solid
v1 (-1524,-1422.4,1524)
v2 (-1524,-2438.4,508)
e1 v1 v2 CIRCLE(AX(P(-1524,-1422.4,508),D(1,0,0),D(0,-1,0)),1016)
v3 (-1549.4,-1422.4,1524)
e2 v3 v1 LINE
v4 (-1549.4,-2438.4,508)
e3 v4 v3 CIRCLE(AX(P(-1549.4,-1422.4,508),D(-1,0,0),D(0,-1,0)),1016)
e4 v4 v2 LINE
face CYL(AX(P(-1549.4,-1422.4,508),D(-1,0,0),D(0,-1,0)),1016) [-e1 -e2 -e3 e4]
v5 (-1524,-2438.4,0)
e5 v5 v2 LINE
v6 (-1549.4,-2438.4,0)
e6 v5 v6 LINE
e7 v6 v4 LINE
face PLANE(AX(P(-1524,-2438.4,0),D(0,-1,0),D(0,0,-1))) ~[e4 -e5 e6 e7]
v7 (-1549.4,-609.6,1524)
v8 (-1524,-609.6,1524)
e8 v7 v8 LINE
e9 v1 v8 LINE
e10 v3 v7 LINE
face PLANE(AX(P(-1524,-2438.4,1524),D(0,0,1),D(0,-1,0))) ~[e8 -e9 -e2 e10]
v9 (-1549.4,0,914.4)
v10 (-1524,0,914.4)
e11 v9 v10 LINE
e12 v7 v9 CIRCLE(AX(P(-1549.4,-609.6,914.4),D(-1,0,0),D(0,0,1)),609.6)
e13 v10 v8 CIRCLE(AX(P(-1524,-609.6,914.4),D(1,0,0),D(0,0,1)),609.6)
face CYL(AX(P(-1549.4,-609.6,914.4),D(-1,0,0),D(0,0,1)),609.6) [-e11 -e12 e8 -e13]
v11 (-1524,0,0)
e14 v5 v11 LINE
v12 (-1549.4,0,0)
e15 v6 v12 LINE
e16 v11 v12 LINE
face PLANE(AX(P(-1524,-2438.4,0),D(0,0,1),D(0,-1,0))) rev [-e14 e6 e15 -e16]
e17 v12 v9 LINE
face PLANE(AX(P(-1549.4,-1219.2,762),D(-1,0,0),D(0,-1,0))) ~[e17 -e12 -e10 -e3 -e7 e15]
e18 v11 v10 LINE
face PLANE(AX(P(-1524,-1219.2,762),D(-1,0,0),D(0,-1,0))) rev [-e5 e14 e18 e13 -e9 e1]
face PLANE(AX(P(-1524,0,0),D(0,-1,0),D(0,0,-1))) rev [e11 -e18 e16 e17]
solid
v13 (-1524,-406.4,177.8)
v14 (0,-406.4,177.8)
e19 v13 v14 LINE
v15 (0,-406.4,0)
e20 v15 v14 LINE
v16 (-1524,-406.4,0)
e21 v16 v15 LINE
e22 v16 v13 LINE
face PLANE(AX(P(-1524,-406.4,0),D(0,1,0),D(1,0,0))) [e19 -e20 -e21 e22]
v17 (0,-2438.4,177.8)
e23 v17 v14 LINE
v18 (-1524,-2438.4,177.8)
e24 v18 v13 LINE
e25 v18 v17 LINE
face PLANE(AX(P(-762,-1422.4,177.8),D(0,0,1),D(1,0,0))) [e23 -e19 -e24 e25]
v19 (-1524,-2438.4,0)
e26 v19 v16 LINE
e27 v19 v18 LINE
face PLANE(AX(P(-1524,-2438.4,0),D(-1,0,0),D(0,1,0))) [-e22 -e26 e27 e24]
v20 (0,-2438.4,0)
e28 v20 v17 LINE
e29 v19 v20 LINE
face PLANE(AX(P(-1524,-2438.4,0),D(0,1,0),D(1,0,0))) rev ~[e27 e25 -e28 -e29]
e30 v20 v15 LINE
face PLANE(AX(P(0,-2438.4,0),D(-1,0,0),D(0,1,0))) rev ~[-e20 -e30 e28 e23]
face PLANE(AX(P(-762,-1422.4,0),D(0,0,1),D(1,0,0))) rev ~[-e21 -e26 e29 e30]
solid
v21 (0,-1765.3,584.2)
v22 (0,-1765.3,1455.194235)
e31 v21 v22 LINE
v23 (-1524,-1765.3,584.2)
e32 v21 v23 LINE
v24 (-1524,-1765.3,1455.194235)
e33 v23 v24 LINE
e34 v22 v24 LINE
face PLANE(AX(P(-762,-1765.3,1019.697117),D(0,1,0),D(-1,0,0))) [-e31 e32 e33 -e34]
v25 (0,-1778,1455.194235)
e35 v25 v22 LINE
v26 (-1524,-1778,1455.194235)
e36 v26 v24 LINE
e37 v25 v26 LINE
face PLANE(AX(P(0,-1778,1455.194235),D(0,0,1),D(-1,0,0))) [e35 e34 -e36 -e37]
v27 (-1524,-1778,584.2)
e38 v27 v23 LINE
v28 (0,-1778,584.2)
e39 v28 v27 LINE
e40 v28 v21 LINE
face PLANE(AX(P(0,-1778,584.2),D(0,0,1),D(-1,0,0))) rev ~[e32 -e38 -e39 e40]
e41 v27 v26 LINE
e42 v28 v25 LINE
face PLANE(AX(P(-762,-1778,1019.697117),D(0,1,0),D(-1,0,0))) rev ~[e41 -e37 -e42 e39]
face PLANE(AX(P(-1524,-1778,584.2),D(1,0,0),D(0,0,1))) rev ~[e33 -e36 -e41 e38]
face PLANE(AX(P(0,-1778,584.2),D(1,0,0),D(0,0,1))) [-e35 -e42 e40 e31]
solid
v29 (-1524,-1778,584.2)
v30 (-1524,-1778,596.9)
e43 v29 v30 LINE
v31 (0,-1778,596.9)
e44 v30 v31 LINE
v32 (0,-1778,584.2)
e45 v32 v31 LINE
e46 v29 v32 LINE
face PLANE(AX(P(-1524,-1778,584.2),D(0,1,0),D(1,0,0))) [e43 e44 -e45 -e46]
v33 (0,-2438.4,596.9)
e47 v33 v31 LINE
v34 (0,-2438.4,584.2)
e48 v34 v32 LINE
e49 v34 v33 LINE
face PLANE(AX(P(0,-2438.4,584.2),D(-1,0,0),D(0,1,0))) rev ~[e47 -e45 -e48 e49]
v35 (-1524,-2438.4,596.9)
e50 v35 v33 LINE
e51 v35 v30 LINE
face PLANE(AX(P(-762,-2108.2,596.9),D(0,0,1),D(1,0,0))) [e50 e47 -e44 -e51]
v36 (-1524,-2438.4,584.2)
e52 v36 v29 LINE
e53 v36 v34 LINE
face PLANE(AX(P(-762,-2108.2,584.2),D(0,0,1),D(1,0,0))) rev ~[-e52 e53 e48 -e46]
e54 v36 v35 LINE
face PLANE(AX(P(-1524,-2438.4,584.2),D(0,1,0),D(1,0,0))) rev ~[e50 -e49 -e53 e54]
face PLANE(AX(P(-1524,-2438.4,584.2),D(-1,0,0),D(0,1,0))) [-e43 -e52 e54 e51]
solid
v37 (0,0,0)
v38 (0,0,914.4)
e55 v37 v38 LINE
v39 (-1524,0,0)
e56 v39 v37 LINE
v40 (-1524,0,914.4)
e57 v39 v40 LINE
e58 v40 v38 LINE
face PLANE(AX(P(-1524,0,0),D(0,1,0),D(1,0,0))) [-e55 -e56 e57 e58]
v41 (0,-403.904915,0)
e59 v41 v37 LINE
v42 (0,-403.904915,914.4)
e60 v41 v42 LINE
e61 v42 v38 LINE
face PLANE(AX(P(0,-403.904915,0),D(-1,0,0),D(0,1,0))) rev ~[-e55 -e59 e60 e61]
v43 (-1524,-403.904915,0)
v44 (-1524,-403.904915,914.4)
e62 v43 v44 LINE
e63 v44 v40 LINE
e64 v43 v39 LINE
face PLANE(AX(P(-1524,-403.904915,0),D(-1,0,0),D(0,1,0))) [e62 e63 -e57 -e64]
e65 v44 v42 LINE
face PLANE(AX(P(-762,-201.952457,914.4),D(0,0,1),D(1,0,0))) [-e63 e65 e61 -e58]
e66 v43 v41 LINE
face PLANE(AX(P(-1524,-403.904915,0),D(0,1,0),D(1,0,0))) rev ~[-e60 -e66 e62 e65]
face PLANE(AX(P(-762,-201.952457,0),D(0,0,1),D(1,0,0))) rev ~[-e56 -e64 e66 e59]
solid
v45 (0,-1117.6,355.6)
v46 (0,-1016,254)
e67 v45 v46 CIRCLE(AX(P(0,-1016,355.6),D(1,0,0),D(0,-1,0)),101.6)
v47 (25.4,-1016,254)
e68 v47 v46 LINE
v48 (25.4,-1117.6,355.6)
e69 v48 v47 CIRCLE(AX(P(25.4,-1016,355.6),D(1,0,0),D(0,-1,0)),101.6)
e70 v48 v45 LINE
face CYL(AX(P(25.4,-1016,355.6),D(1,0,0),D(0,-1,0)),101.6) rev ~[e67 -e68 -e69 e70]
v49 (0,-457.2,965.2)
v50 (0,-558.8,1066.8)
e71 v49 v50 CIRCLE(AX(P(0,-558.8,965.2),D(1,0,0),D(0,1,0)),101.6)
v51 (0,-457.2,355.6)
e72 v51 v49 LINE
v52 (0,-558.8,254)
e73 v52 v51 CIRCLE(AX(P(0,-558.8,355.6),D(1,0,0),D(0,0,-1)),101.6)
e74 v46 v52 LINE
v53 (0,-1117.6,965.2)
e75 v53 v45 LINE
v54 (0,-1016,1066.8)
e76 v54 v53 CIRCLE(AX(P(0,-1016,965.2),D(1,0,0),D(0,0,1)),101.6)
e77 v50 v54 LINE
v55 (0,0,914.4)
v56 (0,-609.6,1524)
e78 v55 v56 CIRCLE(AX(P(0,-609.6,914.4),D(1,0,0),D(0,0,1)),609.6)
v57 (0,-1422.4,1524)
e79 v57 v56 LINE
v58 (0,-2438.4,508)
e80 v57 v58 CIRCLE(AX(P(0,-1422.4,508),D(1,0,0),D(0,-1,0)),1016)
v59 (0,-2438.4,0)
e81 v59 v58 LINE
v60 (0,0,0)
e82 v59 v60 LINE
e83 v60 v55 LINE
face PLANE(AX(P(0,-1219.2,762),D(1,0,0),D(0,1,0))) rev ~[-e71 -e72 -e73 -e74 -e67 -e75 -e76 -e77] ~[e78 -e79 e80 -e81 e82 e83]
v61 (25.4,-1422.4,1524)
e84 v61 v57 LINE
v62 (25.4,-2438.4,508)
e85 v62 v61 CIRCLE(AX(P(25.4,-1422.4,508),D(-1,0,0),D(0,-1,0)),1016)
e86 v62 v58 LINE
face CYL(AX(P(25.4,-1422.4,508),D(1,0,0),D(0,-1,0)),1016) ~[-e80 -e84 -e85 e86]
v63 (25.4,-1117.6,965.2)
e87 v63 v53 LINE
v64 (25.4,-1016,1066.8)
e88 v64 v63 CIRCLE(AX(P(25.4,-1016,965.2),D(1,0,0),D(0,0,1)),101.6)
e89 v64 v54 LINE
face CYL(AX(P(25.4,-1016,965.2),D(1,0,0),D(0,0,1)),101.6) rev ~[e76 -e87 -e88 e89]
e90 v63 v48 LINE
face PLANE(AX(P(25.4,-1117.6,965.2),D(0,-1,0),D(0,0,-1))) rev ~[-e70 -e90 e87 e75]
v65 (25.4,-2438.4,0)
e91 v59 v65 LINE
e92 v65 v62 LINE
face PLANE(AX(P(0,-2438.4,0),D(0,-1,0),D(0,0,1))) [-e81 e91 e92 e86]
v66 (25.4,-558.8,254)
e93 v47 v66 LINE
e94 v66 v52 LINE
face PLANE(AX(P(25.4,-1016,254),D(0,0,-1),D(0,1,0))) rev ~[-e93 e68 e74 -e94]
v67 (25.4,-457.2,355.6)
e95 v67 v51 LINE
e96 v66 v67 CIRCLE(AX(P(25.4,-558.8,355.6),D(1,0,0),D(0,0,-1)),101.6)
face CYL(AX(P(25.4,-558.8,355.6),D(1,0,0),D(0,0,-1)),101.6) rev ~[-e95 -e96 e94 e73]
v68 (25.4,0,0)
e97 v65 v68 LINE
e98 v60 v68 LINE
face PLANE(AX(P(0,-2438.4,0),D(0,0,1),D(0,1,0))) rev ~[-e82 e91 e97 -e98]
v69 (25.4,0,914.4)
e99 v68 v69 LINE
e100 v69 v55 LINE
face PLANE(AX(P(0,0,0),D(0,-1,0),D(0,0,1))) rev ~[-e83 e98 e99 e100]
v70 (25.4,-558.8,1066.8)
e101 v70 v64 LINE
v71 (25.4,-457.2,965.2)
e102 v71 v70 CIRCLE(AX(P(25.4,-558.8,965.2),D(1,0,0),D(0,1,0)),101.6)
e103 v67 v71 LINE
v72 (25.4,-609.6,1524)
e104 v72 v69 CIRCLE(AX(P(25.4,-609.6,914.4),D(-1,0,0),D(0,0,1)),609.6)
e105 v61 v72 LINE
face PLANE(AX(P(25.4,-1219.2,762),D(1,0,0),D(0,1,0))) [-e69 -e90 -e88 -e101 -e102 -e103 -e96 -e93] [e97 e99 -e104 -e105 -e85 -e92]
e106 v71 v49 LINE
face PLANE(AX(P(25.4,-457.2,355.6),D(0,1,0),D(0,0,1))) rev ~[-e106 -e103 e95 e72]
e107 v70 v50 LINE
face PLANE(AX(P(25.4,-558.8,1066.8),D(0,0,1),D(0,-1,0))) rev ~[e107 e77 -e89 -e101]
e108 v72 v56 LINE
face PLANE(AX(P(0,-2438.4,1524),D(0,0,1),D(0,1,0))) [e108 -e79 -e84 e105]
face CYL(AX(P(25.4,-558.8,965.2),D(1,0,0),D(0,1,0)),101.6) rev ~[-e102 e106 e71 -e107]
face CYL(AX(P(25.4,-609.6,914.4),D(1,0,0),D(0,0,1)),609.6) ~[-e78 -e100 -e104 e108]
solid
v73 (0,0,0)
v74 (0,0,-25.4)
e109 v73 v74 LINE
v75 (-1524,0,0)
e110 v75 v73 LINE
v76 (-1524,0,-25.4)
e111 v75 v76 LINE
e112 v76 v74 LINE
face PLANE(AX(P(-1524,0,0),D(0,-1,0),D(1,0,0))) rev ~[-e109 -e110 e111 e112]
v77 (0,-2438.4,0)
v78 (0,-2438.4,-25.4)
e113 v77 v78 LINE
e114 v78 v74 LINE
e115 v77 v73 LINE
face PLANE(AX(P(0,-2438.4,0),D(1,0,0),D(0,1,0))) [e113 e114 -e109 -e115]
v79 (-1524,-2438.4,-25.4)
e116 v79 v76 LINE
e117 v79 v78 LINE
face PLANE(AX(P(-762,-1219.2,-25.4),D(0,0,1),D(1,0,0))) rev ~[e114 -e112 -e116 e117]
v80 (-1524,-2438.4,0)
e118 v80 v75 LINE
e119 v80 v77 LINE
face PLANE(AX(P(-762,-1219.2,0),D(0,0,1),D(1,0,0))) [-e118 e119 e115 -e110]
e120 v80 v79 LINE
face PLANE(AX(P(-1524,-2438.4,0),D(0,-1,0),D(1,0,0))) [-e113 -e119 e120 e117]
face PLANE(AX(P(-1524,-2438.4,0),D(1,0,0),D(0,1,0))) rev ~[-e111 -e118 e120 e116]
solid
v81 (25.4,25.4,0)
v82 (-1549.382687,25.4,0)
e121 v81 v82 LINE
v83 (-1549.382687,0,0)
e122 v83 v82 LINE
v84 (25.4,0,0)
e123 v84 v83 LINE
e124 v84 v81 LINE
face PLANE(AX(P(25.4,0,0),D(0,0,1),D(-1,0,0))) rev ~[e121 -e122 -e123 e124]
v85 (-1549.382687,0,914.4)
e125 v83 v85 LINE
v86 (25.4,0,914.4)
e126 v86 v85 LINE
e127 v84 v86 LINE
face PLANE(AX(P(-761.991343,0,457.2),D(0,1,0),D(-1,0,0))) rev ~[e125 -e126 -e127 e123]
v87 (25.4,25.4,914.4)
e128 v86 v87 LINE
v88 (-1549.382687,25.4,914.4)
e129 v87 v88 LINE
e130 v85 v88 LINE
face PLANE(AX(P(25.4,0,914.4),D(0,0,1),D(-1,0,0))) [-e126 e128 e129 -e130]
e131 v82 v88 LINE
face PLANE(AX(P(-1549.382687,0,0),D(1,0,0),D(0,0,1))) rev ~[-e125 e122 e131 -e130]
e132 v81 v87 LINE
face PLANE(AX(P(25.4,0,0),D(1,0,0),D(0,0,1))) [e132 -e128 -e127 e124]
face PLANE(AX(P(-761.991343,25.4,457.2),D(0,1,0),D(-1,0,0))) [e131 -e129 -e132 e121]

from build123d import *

# Parameters (mm, degrees)
F0_W      = 2438.4
F0_H      = 1524
F1_DEPTH  = 25.4
F3_DEPTH  = 25.401
F4_W      = 1524
F4_H      = 2438.4
F5_DEPTH  = 25.4
F8_W      = 1574.782686615
F8_H      = 914.4
F9_DEPTH  = 25.4
F11_DEPTH = 1574.8
F12_W     = 1524
F12_H     = 2032
F13_DEPTH = 177.8
F15_W     = 1524
F15_H     = 660.4
F16_DEPTH = 12.7
F17_W     = 1524
F17_H     = 870.994234848
F18_DEPTH = 12.7
F19_W     = 1524
F19_H     = 403.904914856
F20_DEPTH = 914.4


with BuildPart() as f1:
    # F0 (on Right) → F1 (new body)
    with BuildSketch(Plane.YZ):
        with Locations((-1219.2, 762)):
            Rectangle(F0_W, F0_H)
    extrude(amount=F1_DEPTH)

    # F2 (on face) → F3 (cut, through all)
    with BuildSketch(Plane.YZ.offset(25.4)):
        with BuildLine():
            ThreePointArc((-2438.4, 508), (-2140.8204896855, 1226.4204896855), (-1422.4, 1524))
            Line((-1422.4, 1524), (-2438.4, 1524))
            Line((-2438.4, 1524), (-2438.4, 508))
        make_face()
        with BuildLine():
            ThreePointArc((-609.6, 1524), (-178.5477061887, 1345.4522938113), (0, 914.4))
            Line((0, 914.4), (0, 1524))
            Line((0, 1524), (-609.6, 1524))
        make_face()
    extrude(amount=-F3_DEPTH, mode=Mode.SUBTRACT)


with BuildPart() as f5:
    # F4 (on Top) → F5 (new body)
    with BuildSketch(Plane.XY):
        with Locations((-762, -1219.2)):
            Rectangle(F4_W, F4_H)
    extrude(amount=-F5_DEPTH)


with BuildPart() as f7_1:
    # F7: instance of F1
    add(f1.part.mirror(Plane.YZ.offset(-762)))


with BuildPart() as f9:
    # F8 (on face) → F9 (new body)
    with BuildSketch(Plane(origin=(0, 0, 0), x_dir=(-1, 0, 0), z_dir=(0, 1, 0))):
        with Locations((761.9913433075, 457.2)):
            Rectangle(F8_W, F8_H)
    extrude(amount=F9_DEPTH)


with BuildPart() as f1_1:
    add(f1.part)

    # F10 (on face) → F11 (cut)
    with BuildSketch(Plane.YZ.offset(25.4)):
        with BuildLine():
            Line((-558.8, 1066.8), (-1016, 1066.8))
            ThreePointArc((-1016, 1066.8), (-1087.8420489686, 1037.0420489686), (-1117.6, 965.2))
            Line((-1117.6, 965.2), (-1117.6, 355.6))
            ThreePointArc((-1117.6, 355.6), (-1087.8420489686, 283.7579510314), (-1016, 254))
            Line((-1016, 254), (-558.8, 254))
            ThreePointArc((-558.8, 254), (-486.9579510314, 283.7579510314), (-457.2, 355.6))
            Line((-457.2, 355.6), (-457.2, 965.2))
            ThreePointArc((-457.2, 965.2), (-486.9579510314, 1037.0420489686), (-558.8, 1066.8))
        make_face()
    extrude(amount=-F11_DEPTH, mode=Mode.SUBTRACT)


with BuildPart() as f13:
    # F12 (on face) → F13 (new body)
    with BuildSketch(Plane.XY):
        with Locations((-762, -1422.4)):
            Rectangle(F12_W, F12_H)
    extrude(amount=F13_DEPTH)


with BuildPart() as f16:
    # F15 (on offset) → F16 (new body)
    with BuildSketch(Plane.XY.offset(584.2)):
        with Locations((-762, -2108.2)):
            Rectangle(F15_W, F15_H)
    extrude(amount=F16_DEPTH)


with BuildPart() as f18:
    # F17 (on face) → F18 (new body)
    with BuildSketch(Plane(origin=(0, -1778, 0), x_dir=(-1, 0, 0), z_dir=(0, 1, 0))):
        with Locations((762, 1019.697117424)):
            Rectangle(F17_W, F17_H)
    extrude(amount=F18_DEPTH)


with BuildPart() as f20:
    # F19 (on face) → F20 (new body)
    with BuildSketch(Plane.XY):
        with Locations((-762, -201.952457428)):
            Rectangle(F19_W, F19_H)
    extrude(amount=F20_DEPTH)


solid = Compound([f5.part, f7_1.part, f9.part, f1_1.part, f13.part, f16.part, f18.part, f20.part])
